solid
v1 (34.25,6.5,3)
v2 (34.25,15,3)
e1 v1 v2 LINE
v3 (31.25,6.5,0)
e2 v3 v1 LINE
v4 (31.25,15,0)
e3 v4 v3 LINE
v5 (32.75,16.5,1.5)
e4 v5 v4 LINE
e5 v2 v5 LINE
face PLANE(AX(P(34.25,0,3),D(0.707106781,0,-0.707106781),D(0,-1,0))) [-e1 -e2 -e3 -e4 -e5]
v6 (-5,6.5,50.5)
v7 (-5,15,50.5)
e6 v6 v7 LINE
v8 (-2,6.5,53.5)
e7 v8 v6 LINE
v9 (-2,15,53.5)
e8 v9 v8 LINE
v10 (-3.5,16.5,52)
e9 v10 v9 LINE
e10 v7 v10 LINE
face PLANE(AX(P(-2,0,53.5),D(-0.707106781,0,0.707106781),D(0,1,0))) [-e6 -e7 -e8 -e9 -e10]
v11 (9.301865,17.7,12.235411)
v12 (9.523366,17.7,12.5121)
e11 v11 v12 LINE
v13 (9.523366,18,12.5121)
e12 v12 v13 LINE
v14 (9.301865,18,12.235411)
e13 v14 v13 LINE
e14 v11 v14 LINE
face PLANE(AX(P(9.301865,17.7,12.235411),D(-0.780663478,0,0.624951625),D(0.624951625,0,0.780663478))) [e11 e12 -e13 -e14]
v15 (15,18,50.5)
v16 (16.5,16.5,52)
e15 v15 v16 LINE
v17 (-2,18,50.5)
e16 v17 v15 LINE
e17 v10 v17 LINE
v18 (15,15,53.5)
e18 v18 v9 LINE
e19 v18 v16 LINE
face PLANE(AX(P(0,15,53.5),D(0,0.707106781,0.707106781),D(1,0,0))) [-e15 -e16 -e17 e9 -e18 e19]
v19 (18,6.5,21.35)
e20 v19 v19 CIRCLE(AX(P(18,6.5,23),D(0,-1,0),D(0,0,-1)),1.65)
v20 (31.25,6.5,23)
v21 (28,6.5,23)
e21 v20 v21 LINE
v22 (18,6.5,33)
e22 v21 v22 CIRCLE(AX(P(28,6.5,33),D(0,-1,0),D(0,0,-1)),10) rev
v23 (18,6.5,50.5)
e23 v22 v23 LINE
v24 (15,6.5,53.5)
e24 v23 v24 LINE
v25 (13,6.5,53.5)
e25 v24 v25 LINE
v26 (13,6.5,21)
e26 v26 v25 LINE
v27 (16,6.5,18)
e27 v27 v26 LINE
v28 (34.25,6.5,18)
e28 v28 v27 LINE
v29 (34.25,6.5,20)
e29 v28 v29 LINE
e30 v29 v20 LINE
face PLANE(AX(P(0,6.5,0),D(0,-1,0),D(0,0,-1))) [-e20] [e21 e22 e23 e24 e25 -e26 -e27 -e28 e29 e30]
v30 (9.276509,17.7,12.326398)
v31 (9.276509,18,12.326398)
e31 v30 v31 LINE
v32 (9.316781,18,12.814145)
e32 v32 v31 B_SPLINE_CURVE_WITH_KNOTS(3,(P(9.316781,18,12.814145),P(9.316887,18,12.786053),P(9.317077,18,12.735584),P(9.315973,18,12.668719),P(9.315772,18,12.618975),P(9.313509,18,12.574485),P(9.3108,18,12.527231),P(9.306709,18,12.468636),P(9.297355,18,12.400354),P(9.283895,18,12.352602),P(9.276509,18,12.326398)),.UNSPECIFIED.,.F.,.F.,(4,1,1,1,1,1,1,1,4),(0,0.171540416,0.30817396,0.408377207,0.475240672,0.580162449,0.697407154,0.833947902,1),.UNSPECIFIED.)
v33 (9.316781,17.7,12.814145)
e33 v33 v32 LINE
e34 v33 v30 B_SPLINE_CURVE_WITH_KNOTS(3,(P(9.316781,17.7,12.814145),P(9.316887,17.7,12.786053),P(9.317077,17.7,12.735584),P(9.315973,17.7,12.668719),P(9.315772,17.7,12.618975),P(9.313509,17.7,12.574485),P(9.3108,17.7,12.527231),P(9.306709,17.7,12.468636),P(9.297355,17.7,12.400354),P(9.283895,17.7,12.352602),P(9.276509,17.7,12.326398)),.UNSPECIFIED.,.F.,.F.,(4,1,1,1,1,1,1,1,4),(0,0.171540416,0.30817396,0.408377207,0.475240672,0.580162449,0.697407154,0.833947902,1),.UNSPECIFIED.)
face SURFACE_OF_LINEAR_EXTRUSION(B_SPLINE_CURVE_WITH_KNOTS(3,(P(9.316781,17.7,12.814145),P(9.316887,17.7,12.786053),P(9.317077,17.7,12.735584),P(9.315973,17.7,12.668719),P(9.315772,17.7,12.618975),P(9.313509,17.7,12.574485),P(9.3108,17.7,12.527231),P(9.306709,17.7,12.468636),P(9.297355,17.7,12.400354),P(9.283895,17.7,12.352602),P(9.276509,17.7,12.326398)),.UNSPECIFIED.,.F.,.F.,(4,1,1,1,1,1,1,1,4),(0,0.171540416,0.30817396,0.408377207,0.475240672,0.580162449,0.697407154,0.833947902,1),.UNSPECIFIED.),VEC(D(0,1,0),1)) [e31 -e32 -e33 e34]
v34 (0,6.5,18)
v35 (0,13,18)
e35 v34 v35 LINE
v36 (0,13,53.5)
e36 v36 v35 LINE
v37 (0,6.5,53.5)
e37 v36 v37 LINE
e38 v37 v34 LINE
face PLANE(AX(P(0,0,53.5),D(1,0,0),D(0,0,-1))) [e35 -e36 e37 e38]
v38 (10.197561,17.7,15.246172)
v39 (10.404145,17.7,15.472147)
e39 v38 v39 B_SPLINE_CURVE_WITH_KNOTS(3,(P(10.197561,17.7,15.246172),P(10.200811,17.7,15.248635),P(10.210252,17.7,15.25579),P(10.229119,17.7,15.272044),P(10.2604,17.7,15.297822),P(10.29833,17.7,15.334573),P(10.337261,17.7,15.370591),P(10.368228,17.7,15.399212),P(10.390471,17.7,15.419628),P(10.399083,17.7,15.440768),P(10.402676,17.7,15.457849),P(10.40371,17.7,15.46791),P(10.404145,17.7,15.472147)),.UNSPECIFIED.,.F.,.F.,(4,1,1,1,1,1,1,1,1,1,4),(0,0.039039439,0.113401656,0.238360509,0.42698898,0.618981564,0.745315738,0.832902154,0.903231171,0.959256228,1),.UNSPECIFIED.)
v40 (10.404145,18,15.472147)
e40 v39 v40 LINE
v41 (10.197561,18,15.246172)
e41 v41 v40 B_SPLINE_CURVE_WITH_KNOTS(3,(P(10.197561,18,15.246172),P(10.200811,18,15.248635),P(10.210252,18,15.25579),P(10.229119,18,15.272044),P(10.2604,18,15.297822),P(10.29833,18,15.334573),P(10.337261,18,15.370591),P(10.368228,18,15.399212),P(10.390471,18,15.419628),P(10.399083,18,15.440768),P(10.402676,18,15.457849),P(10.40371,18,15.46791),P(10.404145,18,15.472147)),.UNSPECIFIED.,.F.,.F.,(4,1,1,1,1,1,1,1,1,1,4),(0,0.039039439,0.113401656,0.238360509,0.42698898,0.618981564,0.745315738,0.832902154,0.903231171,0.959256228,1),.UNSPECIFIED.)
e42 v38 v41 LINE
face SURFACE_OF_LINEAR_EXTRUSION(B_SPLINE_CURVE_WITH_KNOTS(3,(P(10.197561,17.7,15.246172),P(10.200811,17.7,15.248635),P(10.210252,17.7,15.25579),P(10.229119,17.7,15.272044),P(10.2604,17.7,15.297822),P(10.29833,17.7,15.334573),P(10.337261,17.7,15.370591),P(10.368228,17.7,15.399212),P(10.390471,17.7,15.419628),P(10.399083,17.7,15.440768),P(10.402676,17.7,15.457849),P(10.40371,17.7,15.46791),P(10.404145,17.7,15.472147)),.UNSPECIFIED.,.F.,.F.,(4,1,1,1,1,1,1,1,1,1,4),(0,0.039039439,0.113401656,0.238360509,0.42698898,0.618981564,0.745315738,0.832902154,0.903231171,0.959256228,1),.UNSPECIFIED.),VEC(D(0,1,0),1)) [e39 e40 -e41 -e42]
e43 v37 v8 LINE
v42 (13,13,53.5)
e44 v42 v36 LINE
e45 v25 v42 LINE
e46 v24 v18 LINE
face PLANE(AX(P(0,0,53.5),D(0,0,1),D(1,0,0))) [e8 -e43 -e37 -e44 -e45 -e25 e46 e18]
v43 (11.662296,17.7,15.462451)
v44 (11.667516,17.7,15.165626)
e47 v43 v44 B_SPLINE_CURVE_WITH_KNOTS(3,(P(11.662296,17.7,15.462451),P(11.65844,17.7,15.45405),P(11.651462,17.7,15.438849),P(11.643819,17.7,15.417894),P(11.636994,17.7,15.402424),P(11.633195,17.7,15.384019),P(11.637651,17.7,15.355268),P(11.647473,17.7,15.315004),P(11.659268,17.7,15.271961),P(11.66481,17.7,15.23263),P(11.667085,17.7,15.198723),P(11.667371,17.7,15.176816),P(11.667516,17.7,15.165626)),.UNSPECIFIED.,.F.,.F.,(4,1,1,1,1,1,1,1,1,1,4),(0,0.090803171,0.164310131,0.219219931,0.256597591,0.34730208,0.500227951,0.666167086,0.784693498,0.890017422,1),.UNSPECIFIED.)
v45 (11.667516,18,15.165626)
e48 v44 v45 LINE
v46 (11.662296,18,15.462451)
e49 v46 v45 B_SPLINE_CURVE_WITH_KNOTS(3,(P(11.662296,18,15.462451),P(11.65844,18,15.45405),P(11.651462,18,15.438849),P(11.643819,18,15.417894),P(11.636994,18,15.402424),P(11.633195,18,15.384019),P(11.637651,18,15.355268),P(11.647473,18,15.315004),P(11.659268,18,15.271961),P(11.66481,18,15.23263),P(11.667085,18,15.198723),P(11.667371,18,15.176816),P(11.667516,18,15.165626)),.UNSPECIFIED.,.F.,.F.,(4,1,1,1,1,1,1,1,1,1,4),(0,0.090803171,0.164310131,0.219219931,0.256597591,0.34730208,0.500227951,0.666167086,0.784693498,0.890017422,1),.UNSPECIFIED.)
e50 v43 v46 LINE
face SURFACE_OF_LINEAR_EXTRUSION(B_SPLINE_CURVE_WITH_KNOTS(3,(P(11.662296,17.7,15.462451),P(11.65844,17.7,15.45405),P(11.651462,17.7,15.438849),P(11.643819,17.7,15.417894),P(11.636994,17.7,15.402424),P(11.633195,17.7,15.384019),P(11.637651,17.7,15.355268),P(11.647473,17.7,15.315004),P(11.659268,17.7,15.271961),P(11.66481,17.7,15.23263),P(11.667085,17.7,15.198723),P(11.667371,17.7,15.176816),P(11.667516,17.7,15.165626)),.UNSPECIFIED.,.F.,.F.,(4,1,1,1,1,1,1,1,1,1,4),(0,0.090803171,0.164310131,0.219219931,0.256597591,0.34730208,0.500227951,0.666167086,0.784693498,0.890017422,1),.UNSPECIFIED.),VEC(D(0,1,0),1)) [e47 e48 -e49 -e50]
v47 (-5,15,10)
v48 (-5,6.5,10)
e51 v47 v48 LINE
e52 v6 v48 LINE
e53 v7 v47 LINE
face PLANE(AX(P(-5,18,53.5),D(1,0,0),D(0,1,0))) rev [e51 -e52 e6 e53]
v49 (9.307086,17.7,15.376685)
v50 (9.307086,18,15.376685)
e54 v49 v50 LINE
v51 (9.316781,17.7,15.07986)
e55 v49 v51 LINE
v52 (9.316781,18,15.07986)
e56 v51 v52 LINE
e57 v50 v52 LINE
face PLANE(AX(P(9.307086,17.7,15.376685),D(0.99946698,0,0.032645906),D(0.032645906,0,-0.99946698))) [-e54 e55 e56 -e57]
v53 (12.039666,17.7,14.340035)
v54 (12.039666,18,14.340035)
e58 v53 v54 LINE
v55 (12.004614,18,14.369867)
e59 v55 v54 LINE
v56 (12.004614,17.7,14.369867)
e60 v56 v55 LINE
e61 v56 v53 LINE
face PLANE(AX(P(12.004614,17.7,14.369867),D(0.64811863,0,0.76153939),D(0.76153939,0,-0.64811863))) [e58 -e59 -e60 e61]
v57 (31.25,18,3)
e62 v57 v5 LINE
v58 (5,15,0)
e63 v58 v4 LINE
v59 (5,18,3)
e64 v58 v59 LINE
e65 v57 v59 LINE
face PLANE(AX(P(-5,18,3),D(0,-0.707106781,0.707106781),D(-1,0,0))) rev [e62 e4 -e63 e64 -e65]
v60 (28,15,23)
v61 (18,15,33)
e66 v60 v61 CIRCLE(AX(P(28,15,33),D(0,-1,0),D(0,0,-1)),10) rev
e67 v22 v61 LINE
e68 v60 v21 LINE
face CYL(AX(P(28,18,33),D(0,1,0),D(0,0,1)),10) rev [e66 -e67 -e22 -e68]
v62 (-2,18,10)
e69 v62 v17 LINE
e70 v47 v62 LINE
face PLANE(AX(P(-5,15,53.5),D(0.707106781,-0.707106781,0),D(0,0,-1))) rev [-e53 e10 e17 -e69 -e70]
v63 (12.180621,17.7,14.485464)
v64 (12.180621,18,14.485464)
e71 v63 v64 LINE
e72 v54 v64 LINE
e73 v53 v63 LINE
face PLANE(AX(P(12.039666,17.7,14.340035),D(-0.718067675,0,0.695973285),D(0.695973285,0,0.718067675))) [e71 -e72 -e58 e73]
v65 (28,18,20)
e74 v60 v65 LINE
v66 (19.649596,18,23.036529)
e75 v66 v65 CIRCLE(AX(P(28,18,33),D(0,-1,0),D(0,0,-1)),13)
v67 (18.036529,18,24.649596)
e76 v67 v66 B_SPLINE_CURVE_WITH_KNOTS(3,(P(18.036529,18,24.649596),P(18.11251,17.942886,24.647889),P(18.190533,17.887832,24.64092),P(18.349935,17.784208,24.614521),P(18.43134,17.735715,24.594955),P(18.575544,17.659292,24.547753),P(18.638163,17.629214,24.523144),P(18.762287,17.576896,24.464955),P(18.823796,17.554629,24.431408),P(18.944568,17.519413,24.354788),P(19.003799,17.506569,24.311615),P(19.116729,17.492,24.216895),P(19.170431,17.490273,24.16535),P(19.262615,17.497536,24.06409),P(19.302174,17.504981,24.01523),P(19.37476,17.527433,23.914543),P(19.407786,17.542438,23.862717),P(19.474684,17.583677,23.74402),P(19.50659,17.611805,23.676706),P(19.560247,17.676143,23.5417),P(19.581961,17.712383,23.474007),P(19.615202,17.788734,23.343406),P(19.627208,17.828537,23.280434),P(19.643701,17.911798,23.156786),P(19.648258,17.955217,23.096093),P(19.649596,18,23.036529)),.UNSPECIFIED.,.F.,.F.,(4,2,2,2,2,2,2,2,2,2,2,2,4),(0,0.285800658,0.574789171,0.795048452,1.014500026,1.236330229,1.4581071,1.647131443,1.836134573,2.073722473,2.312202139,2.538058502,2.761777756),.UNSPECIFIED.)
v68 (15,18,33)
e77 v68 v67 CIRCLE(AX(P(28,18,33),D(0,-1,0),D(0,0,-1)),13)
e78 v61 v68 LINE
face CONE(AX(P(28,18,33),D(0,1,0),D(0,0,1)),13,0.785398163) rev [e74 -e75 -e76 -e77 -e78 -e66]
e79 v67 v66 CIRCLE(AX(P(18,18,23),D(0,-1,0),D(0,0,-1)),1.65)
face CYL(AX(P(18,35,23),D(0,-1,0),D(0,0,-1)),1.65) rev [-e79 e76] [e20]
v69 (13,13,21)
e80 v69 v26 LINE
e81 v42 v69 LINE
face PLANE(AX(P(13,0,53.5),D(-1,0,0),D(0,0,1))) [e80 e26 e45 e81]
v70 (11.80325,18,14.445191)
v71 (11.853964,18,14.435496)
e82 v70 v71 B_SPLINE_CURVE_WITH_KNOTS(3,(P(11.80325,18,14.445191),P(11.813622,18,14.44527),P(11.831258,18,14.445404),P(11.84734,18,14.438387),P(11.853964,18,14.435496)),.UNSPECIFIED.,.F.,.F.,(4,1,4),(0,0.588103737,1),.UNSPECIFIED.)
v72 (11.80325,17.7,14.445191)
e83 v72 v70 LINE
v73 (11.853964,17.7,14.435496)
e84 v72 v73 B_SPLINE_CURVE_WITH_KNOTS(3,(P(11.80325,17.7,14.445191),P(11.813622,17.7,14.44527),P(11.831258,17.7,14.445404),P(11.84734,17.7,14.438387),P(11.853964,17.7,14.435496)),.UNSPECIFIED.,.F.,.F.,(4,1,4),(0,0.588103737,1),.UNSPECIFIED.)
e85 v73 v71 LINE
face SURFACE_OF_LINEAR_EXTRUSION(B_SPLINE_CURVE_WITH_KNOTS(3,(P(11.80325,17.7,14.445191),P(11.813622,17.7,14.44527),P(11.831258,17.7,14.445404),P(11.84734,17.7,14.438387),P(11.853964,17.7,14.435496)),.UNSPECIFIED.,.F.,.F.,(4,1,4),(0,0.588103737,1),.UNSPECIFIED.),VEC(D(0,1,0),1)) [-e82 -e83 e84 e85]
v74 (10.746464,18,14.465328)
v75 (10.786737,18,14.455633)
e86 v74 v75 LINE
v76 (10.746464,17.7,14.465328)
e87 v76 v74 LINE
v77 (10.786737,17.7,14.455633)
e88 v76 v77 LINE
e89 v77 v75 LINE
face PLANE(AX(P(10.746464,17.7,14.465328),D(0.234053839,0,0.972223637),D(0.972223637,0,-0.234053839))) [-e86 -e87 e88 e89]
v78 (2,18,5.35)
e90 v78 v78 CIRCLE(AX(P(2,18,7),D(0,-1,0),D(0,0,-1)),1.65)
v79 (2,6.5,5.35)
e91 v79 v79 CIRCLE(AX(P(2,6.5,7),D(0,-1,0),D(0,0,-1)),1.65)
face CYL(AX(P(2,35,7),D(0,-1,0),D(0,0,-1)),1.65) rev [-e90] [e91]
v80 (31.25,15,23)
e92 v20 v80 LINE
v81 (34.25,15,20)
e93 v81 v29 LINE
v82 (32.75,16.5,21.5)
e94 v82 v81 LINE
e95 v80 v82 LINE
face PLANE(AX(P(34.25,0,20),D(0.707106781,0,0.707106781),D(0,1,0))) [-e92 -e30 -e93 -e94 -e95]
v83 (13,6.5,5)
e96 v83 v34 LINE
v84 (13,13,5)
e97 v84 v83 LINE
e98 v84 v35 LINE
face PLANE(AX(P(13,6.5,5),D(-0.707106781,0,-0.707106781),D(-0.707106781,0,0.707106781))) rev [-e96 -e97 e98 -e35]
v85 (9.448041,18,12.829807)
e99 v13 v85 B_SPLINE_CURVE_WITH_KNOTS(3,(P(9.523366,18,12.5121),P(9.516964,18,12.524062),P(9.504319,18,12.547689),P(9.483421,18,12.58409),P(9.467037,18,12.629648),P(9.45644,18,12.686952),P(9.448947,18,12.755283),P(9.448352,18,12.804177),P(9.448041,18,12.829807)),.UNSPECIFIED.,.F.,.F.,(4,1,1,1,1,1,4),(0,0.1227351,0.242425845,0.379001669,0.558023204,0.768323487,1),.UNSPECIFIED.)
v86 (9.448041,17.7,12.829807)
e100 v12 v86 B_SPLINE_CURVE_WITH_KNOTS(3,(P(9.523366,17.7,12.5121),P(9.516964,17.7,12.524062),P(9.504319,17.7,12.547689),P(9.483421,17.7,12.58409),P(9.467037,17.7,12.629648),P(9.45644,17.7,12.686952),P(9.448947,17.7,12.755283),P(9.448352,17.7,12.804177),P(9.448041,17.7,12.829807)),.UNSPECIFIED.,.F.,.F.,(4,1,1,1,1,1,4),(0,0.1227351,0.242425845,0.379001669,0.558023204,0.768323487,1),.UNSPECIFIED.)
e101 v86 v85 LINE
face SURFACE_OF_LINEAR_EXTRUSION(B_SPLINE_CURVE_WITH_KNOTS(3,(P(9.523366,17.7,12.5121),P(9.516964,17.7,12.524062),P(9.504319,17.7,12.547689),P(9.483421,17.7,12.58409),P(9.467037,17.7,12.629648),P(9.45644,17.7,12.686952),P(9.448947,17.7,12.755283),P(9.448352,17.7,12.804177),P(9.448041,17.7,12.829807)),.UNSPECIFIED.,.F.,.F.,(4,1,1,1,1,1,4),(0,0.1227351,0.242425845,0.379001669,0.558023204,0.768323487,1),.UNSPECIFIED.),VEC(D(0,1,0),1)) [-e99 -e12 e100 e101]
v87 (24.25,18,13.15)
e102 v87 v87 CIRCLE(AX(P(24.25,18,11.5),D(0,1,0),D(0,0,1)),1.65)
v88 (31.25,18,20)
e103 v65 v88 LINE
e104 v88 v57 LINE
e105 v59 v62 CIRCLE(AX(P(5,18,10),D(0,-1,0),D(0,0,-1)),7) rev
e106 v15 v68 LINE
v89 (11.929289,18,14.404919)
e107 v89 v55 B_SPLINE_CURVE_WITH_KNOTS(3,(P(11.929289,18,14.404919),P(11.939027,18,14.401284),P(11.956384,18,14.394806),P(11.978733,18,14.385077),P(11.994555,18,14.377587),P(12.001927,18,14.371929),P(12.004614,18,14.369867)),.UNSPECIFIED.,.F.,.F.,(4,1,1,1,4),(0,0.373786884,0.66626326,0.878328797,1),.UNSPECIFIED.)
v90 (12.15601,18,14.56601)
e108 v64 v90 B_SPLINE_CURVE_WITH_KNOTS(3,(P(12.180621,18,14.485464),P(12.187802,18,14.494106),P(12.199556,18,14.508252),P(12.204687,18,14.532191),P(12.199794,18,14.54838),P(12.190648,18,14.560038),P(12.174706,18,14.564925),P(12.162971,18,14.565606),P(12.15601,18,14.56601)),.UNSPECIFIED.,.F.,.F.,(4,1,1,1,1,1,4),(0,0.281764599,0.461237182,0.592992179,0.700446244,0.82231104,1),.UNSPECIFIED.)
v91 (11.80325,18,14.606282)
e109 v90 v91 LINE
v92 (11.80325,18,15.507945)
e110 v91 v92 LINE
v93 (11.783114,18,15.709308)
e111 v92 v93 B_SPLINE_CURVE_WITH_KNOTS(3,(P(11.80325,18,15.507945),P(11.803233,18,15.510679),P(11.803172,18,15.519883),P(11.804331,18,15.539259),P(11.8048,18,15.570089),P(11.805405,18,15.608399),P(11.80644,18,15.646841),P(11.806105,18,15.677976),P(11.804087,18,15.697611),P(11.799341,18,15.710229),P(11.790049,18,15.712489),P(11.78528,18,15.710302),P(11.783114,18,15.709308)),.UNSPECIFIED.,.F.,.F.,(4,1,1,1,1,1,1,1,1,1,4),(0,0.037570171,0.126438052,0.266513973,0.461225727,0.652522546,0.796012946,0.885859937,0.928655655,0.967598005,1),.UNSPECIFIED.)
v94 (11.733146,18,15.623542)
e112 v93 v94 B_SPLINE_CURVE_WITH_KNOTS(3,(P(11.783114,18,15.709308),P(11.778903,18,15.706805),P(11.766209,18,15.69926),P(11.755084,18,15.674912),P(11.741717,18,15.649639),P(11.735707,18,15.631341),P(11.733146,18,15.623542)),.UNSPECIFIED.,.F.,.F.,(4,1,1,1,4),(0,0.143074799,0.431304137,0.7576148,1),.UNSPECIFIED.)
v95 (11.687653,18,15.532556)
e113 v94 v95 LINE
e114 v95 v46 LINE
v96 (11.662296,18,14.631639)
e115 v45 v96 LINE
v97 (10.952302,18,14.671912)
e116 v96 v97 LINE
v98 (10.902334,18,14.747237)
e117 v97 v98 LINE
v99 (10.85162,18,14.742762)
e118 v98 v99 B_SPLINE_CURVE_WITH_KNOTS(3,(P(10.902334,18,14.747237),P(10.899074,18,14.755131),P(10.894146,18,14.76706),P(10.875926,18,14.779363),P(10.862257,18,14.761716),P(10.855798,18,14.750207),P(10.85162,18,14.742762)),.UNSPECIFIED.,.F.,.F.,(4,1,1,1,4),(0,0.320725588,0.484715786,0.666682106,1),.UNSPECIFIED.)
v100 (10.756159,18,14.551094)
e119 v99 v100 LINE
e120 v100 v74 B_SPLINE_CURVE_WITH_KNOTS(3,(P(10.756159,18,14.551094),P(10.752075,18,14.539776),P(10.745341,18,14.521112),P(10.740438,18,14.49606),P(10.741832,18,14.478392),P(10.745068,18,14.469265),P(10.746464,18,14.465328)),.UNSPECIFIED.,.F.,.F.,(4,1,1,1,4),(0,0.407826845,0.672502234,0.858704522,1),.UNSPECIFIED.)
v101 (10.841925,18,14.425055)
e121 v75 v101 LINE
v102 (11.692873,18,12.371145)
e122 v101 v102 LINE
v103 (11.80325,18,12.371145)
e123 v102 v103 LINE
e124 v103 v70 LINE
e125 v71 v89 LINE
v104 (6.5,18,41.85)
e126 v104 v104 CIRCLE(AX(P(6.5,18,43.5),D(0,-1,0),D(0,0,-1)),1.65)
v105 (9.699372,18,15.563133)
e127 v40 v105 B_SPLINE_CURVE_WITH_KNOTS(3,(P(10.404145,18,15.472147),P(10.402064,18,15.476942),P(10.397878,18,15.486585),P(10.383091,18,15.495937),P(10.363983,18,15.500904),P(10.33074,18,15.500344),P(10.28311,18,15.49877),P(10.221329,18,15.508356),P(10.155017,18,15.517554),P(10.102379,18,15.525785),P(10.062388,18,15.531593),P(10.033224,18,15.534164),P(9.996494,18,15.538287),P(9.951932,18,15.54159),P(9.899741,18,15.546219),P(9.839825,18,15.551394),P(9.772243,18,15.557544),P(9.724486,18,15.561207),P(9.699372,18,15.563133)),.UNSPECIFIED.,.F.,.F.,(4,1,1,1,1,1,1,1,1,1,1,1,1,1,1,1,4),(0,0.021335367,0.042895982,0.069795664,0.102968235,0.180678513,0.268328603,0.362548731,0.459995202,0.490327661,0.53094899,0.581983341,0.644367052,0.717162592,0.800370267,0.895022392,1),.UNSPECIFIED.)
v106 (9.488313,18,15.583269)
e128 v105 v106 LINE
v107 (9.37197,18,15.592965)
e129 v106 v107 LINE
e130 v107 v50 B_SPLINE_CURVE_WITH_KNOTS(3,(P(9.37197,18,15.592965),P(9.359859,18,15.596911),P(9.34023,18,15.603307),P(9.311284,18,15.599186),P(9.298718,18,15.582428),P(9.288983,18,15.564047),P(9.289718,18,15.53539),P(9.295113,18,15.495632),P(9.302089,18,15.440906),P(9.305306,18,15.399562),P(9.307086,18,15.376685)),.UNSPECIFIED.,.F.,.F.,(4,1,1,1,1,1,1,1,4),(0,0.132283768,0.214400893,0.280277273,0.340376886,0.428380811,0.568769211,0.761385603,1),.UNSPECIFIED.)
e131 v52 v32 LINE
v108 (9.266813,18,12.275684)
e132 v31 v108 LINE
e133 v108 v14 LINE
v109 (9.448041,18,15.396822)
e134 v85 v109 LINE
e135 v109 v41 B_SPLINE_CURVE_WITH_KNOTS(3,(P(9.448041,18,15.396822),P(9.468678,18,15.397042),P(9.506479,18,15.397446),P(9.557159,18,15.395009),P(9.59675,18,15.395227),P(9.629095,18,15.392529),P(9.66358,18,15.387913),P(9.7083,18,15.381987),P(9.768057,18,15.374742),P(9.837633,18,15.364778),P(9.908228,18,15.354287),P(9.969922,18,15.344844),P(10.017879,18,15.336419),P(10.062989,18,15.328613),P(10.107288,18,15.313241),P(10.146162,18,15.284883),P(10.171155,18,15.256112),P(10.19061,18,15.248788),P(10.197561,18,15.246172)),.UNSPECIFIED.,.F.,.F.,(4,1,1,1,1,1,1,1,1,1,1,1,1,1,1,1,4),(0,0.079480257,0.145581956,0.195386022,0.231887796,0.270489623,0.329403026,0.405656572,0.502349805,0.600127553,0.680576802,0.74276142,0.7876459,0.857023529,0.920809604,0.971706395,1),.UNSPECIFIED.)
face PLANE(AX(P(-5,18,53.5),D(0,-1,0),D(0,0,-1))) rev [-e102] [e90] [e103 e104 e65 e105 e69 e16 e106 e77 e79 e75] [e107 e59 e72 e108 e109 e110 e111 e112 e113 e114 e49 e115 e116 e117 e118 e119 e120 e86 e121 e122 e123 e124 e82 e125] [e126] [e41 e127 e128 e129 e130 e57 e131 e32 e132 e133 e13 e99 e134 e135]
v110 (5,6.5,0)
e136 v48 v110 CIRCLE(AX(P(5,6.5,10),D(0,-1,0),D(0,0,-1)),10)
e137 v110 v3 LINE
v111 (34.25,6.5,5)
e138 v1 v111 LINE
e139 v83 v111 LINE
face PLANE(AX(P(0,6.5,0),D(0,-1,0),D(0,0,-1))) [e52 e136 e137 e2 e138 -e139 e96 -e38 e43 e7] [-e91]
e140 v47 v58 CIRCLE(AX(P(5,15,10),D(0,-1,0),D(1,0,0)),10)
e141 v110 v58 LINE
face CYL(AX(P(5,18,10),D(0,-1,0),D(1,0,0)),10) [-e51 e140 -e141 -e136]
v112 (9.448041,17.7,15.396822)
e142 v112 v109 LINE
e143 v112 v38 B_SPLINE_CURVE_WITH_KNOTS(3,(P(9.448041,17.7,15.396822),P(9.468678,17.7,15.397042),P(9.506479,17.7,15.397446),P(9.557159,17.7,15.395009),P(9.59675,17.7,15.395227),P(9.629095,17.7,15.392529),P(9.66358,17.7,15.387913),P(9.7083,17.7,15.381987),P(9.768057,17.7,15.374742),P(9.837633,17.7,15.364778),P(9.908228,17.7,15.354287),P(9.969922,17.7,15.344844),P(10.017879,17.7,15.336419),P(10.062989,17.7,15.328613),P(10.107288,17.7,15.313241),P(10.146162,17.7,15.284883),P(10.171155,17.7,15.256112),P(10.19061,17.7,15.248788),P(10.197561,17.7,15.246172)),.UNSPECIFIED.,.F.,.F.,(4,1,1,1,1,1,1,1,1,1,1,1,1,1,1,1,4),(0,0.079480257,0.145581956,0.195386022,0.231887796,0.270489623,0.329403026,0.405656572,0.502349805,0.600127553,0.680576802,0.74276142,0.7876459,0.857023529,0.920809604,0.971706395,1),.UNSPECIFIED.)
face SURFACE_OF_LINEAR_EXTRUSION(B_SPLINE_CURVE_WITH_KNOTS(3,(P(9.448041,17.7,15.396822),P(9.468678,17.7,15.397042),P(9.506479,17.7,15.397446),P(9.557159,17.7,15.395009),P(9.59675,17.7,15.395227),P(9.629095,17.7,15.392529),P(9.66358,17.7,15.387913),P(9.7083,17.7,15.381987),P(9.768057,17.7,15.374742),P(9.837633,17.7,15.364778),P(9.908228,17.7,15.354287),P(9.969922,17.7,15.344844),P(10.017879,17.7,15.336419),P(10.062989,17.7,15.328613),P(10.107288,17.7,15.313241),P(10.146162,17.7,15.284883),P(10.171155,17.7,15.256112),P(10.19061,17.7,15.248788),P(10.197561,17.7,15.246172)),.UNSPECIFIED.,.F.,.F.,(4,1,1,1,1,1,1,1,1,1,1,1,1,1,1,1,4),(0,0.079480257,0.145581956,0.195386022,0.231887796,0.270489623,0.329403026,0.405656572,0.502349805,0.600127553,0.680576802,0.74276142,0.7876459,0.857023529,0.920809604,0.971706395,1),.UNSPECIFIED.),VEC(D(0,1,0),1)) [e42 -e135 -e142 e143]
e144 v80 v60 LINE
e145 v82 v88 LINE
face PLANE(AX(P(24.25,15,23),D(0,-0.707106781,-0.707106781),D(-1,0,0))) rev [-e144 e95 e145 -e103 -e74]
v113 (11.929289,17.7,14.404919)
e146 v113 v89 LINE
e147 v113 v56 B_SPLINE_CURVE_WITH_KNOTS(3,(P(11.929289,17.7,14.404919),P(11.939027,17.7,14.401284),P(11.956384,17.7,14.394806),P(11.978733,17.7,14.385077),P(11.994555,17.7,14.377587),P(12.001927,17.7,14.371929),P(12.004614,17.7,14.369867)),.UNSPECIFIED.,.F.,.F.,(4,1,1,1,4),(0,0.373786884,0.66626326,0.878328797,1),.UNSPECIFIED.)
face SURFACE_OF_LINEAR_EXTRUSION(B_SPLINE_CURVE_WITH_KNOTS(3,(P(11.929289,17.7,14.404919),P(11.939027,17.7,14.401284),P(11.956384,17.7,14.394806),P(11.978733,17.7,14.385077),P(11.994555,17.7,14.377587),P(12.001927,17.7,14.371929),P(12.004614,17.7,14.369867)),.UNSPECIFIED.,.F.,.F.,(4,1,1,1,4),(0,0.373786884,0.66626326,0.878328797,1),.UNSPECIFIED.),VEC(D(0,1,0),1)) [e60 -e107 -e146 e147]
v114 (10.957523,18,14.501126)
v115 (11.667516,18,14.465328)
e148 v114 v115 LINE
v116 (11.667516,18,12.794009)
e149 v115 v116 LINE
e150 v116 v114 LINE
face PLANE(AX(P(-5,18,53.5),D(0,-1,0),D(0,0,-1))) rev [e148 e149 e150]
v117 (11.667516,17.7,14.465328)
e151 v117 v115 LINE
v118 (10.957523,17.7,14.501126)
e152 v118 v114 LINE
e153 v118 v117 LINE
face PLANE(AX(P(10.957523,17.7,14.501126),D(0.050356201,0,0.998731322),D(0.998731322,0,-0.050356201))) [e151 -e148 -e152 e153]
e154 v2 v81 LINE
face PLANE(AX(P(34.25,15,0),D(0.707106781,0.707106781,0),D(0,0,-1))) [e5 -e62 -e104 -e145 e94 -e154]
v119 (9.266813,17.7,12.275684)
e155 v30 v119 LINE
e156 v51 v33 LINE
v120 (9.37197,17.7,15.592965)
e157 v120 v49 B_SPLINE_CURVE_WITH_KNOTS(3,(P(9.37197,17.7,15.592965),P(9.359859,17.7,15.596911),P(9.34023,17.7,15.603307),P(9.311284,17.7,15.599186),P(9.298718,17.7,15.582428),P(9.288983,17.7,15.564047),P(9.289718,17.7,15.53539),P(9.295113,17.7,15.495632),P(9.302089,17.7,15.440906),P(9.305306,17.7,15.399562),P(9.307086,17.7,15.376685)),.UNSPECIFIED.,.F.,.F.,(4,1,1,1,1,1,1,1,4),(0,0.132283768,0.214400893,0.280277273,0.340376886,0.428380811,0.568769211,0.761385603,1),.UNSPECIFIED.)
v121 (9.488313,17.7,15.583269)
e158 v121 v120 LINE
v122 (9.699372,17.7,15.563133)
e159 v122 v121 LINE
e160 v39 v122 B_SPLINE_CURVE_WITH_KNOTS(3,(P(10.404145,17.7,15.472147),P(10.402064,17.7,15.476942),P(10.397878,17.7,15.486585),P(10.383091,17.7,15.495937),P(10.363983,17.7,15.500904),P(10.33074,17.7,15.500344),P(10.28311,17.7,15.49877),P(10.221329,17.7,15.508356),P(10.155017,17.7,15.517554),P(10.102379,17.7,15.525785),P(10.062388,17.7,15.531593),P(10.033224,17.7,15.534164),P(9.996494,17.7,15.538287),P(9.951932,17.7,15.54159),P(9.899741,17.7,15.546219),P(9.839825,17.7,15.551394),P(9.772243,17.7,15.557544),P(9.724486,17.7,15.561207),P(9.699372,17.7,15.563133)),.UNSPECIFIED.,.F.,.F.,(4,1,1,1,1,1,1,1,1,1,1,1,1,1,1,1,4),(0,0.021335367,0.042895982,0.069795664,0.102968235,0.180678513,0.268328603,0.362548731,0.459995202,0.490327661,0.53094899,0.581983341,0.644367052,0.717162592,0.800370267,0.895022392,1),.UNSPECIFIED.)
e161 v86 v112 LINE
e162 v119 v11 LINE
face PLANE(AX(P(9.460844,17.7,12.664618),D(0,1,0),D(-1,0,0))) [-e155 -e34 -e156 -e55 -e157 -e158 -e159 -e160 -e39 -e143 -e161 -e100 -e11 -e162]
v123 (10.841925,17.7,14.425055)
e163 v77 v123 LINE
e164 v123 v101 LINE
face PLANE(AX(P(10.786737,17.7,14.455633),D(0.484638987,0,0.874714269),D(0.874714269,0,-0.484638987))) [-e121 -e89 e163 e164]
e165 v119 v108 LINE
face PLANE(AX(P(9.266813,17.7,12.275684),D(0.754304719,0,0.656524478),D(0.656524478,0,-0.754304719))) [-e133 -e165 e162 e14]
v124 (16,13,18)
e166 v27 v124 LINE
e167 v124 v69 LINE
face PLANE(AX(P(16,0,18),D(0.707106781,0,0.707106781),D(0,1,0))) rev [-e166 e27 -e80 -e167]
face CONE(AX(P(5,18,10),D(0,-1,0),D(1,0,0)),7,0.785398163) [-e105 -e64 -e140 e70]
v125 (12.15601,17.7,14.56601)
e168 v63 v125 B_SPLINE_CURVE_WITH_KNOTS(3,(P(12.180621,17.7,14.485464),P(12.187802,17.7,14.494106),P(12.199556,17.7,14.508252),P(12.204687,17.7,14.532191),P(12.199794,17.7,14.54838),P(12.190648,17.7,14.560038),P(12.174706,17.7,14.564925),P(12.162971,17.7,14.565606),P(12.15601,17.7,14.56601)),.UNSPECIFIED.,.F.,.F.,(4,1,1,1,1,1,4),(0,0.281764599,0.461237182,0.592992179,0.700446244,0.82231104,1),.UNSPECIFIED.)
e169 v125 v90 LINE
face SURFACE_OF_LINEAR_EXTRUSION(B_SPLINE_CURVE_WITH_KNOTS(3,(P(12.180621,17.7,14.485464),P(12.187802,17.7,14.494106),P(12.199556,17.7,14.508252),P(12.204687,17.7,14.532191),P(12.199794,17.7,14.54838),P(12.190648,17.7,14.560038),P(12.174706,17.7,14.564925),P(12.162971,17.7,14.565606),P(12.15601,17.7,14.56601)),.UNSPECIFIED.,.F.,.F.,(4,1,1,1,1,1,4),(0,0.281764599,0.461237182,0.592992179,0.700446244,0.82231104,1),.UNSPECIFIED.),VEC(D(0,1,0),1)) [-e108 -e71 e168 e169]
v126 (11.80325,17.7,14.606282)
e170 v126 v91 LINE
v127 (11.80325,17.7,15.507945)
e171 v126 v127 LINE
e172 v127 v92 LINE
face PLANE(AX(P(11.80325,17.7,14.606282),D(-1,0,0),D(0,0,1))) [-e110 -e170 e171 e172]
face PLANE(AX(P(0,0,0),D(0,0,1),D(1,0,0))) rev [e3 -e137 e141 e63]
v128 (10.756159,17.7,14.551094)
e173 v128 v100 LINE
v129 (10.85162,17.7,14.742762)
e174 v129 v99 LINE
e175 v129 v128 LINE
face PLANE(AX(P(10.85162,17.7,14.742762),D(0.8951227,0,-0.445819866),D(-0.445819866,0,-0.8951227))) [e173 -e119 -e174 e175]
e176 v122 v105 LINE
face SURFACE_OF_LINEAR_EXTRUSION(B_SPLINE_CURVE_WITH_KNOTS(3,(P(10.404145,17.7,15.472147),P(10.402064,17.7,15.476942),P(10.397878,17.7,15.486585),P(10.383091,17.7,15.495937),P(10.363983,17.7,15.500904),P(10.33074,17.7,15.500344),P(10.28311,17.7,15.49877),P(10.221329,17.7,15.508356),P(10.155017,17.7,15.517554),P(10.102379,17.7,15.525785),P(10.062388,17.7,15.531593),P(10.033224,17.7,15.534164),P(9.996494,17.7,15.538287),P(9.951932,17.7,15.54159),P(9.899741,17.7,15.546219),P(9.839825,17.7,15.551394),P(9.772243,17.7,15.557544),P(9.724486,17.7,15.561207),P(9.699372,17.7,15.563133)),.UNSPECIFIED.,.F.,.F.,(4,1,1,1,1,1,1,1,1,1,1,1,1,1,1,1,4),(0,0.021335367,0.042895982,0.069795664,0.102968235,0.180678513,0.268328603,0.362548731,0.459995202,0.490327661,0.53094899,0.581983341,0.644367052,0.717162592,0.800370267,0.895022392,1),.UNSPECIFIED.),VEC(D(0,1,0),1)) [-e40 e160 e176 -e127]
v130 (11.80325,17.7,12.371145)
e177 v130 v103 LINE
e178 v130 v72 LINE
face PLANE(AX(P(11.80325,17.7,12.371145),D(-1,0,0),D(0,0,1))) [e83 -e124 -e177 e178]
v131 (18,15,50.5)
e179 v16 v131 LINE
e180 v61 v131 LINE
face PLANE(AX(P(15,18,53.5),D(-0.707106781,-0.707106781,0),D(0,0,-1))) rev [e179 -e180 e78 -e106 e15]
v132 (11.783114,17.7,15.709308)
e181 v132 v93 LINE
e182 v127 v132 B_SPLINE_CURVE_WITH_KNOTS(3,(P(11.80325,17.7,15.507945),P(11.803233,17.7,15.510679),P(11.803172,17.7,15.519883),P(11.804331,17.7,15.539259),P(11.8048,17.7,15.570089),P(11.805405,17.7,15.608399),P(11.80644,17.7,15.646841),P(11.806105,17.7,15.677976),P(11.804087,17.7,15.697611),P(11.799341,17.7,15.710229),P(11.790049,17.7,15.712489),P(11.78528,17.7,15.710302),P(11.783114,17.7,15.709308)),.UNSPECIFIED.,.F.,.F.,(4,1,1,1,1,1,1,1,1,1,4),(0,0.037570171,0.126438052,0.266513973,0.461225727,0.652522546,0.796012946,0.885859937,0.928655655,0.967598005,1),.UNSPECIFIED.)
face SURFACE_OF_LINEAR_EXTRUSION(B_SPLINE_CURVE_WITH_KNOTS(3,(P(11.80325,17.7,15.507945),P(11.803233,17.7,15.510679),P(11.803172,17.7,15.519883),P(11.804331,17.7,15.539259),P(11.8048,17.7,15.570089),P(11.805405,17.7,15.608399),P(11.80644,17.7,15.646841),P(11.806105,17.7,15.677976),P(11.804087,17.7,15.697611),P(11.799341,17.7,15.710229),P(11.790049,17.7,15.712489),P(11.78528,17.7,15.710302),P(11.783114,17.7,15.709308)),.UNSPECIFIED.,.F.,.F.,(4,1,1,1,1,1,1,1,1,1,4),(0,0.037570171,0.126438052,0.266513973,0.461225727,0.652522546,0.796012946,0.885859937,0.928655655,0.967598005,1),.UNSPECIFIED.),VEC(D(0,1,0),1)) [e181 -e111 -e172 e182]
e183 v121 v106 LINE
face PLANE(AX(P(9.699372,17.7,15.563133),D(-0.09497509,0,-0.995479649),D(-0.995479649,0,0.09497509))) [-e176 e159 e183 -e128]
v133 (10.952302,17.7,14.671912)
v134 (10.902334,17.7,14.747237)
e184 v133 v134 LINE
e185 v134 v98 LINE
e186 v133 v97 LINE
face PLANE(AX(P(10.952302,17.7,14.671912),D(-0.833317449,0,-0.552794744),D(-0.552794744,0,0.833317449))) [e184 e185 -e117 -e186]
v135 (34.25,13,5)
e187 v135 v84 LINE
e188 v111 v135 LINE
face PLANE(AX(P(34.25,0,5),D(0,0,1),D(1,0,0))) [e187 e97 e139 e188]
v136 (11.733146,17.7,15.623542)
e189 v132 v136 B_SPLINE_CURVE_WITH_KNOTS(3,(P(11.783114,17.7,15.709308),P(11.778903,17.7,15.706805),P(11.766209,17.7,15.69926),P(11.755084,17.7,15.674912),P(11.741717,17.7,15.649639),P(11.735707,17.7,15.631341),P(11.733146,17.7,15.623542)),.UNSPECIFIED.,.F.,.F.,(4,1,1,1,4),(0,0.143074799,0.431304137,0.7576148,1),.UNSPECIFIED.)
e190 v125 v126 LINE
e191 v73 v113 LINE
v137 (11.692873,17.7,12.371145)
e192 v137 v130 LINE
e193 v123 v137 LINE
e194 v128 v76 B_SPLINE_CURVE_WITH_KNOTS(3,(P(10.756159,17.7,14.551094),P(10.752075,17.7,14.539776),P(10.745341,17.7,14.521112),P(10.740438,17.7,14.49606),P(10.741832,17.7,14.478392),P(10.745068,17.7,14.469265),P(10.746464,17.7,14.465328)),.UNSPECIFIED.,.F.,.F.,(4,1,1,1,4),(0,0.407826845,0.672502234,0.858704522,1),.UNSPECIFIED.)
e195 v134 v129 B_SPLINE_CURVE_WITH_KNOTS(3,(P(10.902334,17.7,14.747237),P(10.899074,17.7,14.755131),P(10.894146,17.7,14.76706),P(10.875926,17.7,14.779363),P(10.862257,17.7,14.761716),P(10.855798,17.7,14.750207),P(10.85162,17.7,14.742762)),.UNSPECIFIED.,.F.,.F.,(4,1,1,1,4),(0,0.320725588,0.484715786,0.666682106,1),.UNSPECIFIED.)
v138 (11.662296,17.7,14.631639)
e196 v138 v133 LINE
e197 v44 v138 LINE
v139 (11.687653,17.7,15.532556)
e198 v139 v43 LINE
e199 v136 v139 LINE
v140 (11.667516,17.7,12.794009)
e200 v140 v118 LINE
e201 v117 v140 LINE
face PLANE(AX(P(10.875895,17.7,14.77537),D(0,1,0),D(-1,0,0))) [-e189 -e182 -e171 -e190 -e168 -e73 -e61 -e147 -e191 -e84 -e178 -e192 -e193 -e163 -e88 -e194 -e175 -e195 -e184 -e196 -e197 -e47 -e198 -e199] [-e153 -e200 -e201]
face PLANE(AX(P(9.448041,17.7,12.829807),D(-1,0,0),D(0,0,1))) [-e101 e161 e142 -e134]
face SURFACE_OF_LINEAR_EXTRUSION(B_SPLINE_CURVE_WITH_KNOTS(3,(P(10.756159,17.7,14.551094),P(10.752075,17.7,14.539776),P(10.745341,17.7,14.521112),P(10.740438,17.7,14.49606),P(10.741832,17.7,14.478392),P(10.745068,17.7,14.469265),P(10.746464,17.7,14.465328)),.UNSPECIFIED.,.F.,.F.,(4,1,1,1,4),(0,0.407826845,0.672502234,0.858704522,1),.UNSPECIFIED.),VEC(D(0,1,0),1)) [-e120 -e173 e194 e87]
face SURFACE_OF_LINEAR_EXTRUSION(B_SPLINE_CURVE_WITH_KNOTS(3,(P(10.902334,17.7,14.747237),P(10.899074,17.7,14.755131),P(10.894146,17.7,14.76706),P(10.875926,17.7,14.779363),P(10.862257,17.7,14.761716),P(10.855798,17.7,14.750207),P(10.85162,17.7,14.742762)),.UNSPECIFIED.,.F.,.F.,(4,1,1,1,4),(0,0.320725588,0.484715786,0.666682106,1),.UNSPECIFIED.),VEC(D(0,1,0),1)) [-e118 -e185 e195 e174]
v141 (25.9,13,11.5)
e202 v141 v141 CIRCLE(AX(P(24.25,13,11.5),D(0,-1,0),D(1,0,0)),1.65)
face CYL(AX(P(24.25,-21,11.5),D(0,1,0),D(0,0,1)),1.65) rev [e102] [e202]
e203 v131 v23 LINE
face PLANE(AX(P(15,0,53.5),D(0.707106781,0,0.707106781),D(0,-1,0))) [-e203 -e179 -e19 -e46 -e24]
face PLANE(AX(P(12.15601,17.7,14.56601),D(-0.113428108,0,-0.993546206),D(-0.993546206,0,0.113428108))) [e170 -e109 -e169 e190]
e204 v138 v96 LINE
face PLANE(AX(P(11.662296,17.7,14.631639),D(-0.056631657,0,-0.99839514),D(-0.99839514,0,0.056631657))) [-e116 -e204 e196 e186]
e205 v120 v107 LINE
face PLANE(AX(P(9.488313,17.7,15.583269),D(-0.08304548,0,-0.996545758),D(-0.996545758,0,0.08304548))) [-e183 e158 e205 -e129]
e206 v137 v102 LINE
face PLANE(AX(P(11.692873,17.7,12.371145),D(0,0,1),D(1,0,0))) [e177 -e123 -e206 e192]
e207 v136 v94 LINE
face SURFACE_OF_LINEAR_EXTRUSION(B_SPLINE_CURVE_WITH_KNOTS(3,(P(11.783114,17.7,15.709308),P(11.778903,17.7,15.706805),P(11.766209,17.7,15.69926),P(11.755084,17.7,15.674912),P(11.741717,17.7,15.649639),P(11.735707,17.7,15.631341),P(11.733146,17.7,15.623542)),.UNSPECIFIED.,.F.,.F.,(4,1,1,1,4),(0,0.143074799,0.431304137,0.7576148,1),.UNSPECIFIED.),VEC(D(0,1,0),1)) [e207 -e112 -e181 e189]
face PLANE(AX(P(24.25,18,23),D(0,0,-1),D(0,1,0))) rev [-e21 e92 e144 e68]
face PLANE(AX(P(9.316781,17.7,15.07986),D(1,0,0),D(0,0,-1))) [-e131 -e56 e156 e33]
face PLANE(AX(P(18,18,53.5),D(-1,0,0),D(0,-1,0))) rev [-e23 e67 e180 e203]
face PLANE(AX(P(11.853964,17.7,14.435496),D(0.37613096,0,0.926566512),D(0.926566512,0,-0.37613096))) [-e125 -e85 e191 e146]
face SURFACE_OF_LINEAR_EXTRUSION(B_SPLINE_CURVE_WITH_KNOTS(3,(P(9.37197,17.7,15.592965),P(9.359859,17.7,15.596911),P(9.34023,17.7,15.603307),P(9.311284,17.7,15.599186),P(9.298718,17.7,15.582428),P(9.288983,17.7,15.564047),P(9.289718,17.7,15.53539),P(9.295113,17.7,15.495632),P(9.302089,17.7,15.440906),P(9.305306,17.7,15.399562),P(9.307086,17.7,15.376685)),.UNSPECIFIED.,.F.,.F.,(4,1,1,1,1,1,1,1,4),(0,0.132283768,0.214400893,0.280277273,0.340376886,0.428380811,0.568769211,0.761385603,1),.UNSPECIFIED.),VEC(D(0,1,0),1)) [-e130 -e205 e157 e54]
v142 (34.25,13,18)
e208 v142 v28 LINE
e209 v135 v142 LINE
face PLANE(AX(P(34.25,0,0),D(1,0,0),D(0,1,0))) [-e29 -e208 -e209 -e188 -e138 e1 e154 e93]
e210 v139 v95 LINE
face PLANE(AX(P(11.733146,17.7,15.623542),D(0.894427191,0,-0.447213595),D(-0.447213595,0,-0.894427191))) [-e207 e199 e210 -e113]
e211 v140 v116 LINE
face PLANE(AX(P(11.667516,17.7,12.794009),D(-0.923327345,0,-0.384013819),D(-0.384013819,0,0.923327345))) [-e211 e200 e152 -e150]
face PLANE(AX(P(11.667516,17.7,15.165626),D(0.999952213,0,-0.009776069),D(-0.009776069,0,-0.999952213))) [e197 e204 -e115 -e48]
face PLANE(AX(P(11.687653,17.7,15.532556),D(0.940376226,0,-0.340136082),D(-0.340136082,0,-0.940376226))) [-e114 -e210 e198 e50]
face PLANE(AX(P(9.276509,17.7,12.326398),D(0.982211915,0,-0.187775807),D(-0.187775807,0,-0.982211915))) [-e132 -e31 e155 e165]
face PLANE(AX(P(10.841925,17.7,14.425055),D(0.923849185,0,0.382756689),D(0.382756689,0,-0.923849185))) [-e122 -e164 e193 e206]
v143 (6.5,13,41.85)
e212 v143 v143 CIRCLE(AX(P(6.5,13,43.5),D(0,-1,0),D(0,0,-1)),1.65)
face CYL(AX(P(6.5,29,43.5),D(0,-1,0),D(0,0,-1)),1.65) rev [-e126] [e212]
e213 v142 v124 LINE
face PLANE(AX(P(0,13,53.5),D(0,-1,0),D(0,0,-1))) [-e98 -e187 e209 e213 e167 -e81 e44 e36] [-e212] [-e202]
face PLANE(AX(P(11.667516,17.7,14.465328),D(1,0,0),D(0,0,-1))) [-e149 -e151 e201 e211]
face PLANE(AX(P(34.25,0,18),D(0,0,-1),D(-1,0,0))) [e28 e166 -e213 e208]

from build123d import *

# Parameters (mm, degrees)
SKETCH_1_W          = 23
SKETCH_1_H          = 23
SKETCH_1_W_2        = 13
SKETCH_1_H_2        = 13
EXTRUDE_1_DEPTH     = 53.5
SKETCH_2_R          = 1.65
CUT_EXTRUDE_1_DEPTH = 34
SKETCH_4_W          = 23
SKETCH_4_H          = 23
SKETCH_4_R          = 3
EXTRUDE_2_DEPTH     = 6.25
SKETCH_5_W          = 23
SKETCH_5_H          = 23
SKETCH_5_W_2        = 13
SKETCH_5_H_2        = 13
EXTRUDE_1_2_DEPTH   = 10
SKETCH_6_R          = 1.65
CUT_EXTRUDE_2_DEPTH = 39
SKETCH_7_W          = 13
SKETCH_7_H          = 13
CUT_EXTRUDE_3_DEPTH = 15.75
CHAMFER_1_SIZE      = 3
SKETCH_8_W          = 39.25
SKETCH_8_H          = 53.5
CUT_EXTRUDE_4_DEPTH = 11.5
EXTRUDE_3_DEPTH     = 6.5
FILLET_1_R          = 10
FILLET_2_R          = 10
SKETCH_10_R         = 1.65
CUT_EXTRUDE_5_DEPTH = 28.5
CHAMFER_3_SIZE      = 3
CHAMFER_4_SIZE      = 3
CHAMFER_5_SIZE      = 3
CUT_EXTRUDE_6_DEPTH = 0.3


with BuildPart() as part:
    # 草图1 → Extrude 1 (new body)
    with BuildSketch(Plane.XY):
        with Locations((6.5, 6.5)):
            Rectangle(SKETCH_1_W, SKETCH_1_H)
        with Locations((6.5, 6.5)):
            Rectangle(SKETCH_1_W_2, SKETCH_1_H_2, mode=Mode.SUBTRACT)
    extrude(amount=EXTRUDE_1_DEPTH)

    # 草图2 → 切除-拉伸1 (cut)
    with BuildSketch(Plane.XZ.offset(5)):
        with Locations(Location((6.5, 43.5, 0), (0, 0, 270))):
            Circle(SKETCH_2_R)
    extrude(amount=-CUT_EXTRUDE_1_DEPTH, mode=Mode.SUBTRACT)

    # 草图4 → 凸台-拉伸2 (add)
    with BuildSketch(Plane(origin=(18, 0, 0), x_dir=(0, 0, -1), z_dir=(1, 0, 0))):
        with Locations((-11.5, 6.5)):
            Rectangle(SKETCH_4_W, SKETCH_4_H)
        with Locations(Location((-11.5, 6.5, 0), (0, 0, 90))):
            Circle(SKETCH_4_R, mode=Mode.SUBTRACT)
    extrude(amount=EXTRUDE_2_DEPTH)

    # 草图5 → Extrude 1 2 (add)
    with BuildSketch(Plane(origin=(24.25, 0, 0), x_dir=(0, 0, -1), z_dir=(1, 0, 0))):
        with Locations((-11.5, 6.5)):
            Rectangle(SKETCH_5_W, SKETCH_5_H)
        with Locations((-11.5, 6.5)):
            Rectangle(SKETCH_5_W_2, SKETCH_5_H_2, mode=Mode.SUBTRACT)
    extrude(amount=EXTRUDE_1_2_DEPTH)

    # 草图6 → 切除-拉伸2 (cut)
    with BuildSketch(Plane(origin=(0, 18, 0), x_dir=(1, 0, 0), z_dir=(0, 1, 0))):
        with Locations(Location((24.25, -11.5, 0), (0, 0, 270))):
            Circle(SKETCH_6_R)
    extrude(amount=-CUT_EXTRUDE_2_DEPTH, mode=Mode.SUBTRACT)

    # 草图7 → 切除-拉伸3 (cut)
    with BuildSketch(Plane(origin=(24.25, 0, 0), x_dir=(0, 0, -1), z_dir=(1, 0, 0))):
        with Locations((-11.5, 6.5)):
            Rectangle(SKETCH_7_W, SKETCH_7_H)
    extrude(amount=-CUT_EXTRUDE_3_DEPTH, mode=Mode.SUBTRACT)

    # 倒角1
    chamfer_1_edges = [part.edges().sort_by_distance(p)[0] for p in [
        (13, 6.5, 18),
    ]]
    chamfer(chamfer_1_edges, length=CHAMFER_1_SIZE)

    # 草图8 → 切除-拉伸4 (cut)
    with BuildSketch(Plane.XZ.offset(5)):
        with Locations((14.625, 26.75)):
            Rectangle(SKETCH_8_W, SKETCH_8_H)
    extrude(amount=-CUT_EXTRUDE_4_DEPTH, mode=Mode.SUBTRACT)

    # 草图9 → 凸台-拉伸3 (add)
    with BuildSketch(Plane.XZ.offset(-13)):
        Polygon((13, 5), (0, 18), (0, 0), (13, 0), align=None)
    extrude(amount=EXTRUDE_3_DEPTH)

    # 圆角1
    fillet_1_edges = [part.edges().sort_by_distance(p)[0] for p in [
        (-5, 12.25, 0),
    ]]
    fillet(fillet_1_edges, radius=FILLET_1_R)

    # 圆角2
    fillet_2_edges = [part.edges().sort_by_distance(p)[0] for p in [
        (18, 12.25, 23),
    ]]
    fillet(fillet_2_edges, radius=FILLET_2_R)

    # 草图10 → 切除-拉伸5 (cut)
    with BuildSketch(Plane.XZ.offset(-6.5)):
        with Locations(Location((2, 7, 0), (0, 0, 270))):
            Circle(SKETCH_10_R)
        with Locations(Location((18, 23, 0), (0, 0, 270))):
            Circle(SKETCH_10_R)
    extrude(amount=-CUT_EXTRUDE_5_DEPTH, mode=Mode.SUBTRACT)

    # 倒角3
    # the kernel refuses this chamfer: 3 mm, written as the material it takes off along each edge
    with BuildSketch(Plane(origin=(5, 18, 10), x_dir=(0, 0, -1), z_dir=(1, 0, 0))) as chamfer_3_piece_1:
        Polygon((10 - CHAMFER_3_SIZE, 0), (10, -CHAMFER_3_SIZE), (10, 0), align=None)
    revolve(axis=Axis((5, 18, 10), (0, 1, 0)), revolution_arc=90, mode=Mode.SUBTRACT)
    with BuildSketch(Plane(origin=(28, 18, 33), x_dir=(-1, 0, 0), z_dir=(0, 0, 1))) as chamfer_3_piece_2:
        Polygon((10 + CHAMFER_3_SIZE, 0), (10, CHAMFER_3_SIZE), (10, 0), align=None)
    revolve(axis=Axis((28, 18, 33), (0, -1, 0)), revolution_arc=90, mode=Mode.SUBTRACT)
    with BuildSketch(Plane(origin=(28, 18, 23), x_dir=(0, 0.027495876610586768, -0.9996219169112968), z_dir=(1, 0, 0))) as chamfer_3_piece_3:
        Polygon((CHAMFER_3_SIZE * 0.999621916911, -CHAMFER_3_SIZE * 0.0274958766106), (-CHAMFER_3_SIZE * 0.0274958766106, -CHAMFER_3_SIZE * 0.999621916911), (0, 0), align=None)
    extrude(amount=13.965048964, mode=Mode.SUBTRACT)
    with BuildSketch(Plane(origin=(41.965048964, 18, 0), x_dir=(0, 0.027495876610586778, 0.9996219169112968), z_dir=(-1, 0, 0))) as chamfer_3_piece_4:
        Polygon((CHAMFER_3_SIZE * 0.999621916911, -CHAMFER_3_SIZE * 0.0274958766106), (-CHAMFER_3_SIZE * 0.0274958766106, -CHAMFER_3_SIZE * 0.999621916911), (0, 0), align=None)
    extrude(amount=36.965048964, mode=Mode.SUBTRACT)
    with BuildSketch(Plane(origin=(-5, 18, 10), x_dir=(0.9996219169112968, 0.027495876610586778, 0), z_dir=(0, 0, 1))) as chamfer_3_piece_5:
        Polygon((CHAMFER_3_SIZE * 0.999621916911, -CHAMFER_3_SIZE * 0.0274958766106), (-CHAMFER_3_SIZE * 0.0274958766106, -CHAMFER_3_SIZE * 0.999621916911), (0, 0), align=None)
    extrude(amount=51.215048964, mode=Mode.SUBTRACT)
    with BuildSketch(Plane(origin=(18, 18, 33), x_dir=(-0.9996219169112968, 0.02749587661058678, 0), z_dir=(0, 0, 1))) as chamfer_3_piece_6:
        Polygon((CHAMFER_3_SIZE * 0.999621916911, CHAMFER_3_SIZE * 0.0274958766106), (-CHAMFER_3_SIZE * 0.0274958766106, CHAMFER_3_SIZE * 0.999621916911), (0, 0), align=None)
    extrude(amount=28.215048964, mode=Mode.SUBTRACT)

    # 倒角4
    chamfer_4_edges = [part.edges().sort_by_distance(p)[0] for p in [
        (34.25, 18, 11.5),
        (6.5, 18, 53.5),
    ]]
    chamfer(chamfer_4_edges, length=CHAMFER_4_SIZE)

    # 倒角5
    chamfer_5_edges = [part.edges().sort_by_distance(p)[0] for p in [
        (34.25, 10.75, 0),
        (18, 10.75, 53.5),
        (-5, 10.75, 53.5),
        (34.25, 10.75, 23),
    ]]
    chamfer(chamfer_5_edges, length=CHAMFER_5_SIZE)

    # 草图11 → 切除-拉伸6 (cut)
    # profile 1 of 2: a face of its own
    with BuildSketch(Plane(origin=(0, 18, 0), x_dir=(1, 0, 0), z_dir=(0, 1, 0))):
        with BuildLine():
            Line((9.266813218, -12.275683704), (9.301865424, -12.235410958))
            Line((9.301865424, -12.235410958), (9.52336553, -12.512099643))
            add(Edge.make_bspline(
                [(9.52336553, -12.512099643), (9.516963751, -12.524061704), (9.504318984, -12.547689117), (9.483420652, -12.58408966), (9.467037494, -12.629648361), (9.4564399, -12.686951648), (9.44894746, -12.755283372), (9.448352464, -12.804177447), (9.448040578, -12.829806867)],
                knots=[0, 0, 0, 0, 0.736410598, 1.454555069, 2.274010016, 3.348139226, 4.609940921, 6, 6, 6, 6], degree=3))
            Line((9.448040578, -12.829806867), (9.448040578, -15.396821569))
            add(Edge.make_bspline(
                [(9.448040578, -15.396821569), (9.468678125, -15.397042087), (9.506479393, -15.397446004), (9.557158846, -15.395009259), (9.596750153, -15.395226891), (9.629094922, -15.392529476), (9.663579716, -15.387912913), (9.708300118, -15.381986855), (9.768057065, -15.374741756), (9.837632832, -15.364777769), (9.908227888, -15.354286785), (9.969922175, -15.344844322), (10.017878618, -15.336418923), (10.062989469, -15.328613359), (10.107288304, -15.313240575), (10.146161972, -15.284882643), (10.171155498, -15.256112424), (10.190610238, -15.248788426), (10.197561141, -15.246171665)],
                knots=[0, 0, 0, 0, 1.271684107, 2.329311289, 3.126176351, 3.710204741, 4.32783396, 5.270448411, 6.49050515, 8.03759688, 9.602040843, 10.889228832, 11.884182716, 12.602334394, 13.712376462, 14.732953672, 15.547302315, 16, 16, 16, 16], degree=3))
            add(Edge.make_bspline(
                [(10.197561141, -15.246171665), (10.200811265, -15.24863479), (10.210252218, -15.255789669), (10.229119367, -15.272044232), (10.26040013, -15.297821919), (10.298329787, -15.334573391), (10.337260708, -15.37059091), (10.368228435, -15.399211988), (10.390470603, -15.419627911), (10.399083222, -15.440767903), (10.402676117, -15.45784931), (10.403710075, -15.467910384), (10.404145415, -15.472146521)],
                knots=[0, 0, 0, 0, 0.390394386, 1.134016561, 2.38360509, 4.269889804, 6.18981564, 7.453157385, 8.329021544, 9.032311711, 9.592562279, 10, 10, 10, 10], degree=3))
            add(Edge.make_bspline(
                [(10.404145415, -15.472146521), (10.40206375, -15.476942394), (10.397878443, -15.486584772), (10.383090877, -15.495937469), (10.363982572, -15.500904408), (10.33073977, -15.500343625), (10.283110462, -15.498769522), (10.22132921, -15.508356201), (10.15501695, -15.517554008), (10.102379022, -15.525784834), (10.062387506, -15.531592767), (10.033223518, -15.534164422), (9.996494325, -15.53828724), (9.951932173, -15.541590229), (9.899741162, -15.546219376), (9.839824995, -15.551393941), (9.772242849, -15.557543502), (9.724485896, -15.561206741), (9.699372349, -15.563133097)],
                knots=[0, 0, 0, 0, 0.341365878, 0.68633572, 1.116730632, 1.647491765, 2.890856209, 4.29325764, 5.800779701, 7.359923239, 7.845242571, 8.495183841, 9.311733456, 10.309872826, 11.474601469, 12.805924266, 14.320358265, 16, 16, 16, 16], degree=3))
            Line((9.699372349, -15.563133097), (9.488313325, -15.58326947))
            Line((9.488313325, -15.58326947), (9.371969835, -15.592964761))
            add(Edge.make_bspline(
                [(9.371969835, -15.592964761), (9.359859022, -15.596910851), (9.340230241, -15.603306534), (9.311283529, -15.599186231), (9.298718203, -15.582428084), (9.288983167, -15.564046832), (9.289718075, -15.535389642), (9.295112786, -15.4956315), (9.302089302, -15.440906027), (9.305306038, -15.399562146), (9.307085965, -15.376685196)],
                knots=[0, 0, 0, 0, 1.058270145, 1.715207142, 2.242218181, 2.723015089, 3.427046488, 4.550153686, 6.091084828, 8, 8, 8, 8], degree=3))
            Line((9.307085965, -15.376685196), (9.316781256, -15.079860137))
            Line((9.316781256, -15.079860137), (9.316781256, -12.814145243))
            add(Edge.make_bspline(
                [(9.316781256, -12.814145243), (9.316886855, -12.786052717), (9.317076564, -12.735584232), (9.315973066, -12.66871921), (9.315772104, -12.618974802), (9.313508673, -12.574485109), (9.310800273, -12.527231104), (9.306709072, -12.46863647), (9.297355447, -12.400354092), (9.283895077, -12.352602109), (9.276508509, -12.326397533)],
                knots=[0, 0, 0, 0, 1.372323329, 2.465391677, 3.267017655, 3.801925377, 4.641299591, 5.579257235, 6.671583216, 8, 8, 8, 8], degree=3))
            Line((9.276508509, -12.326397533), (9.266813218, -12.275683704))
        make_face()
    # profile 2 of 2: a face of its own
    with BuildSketch(Plane(origin=(0, 18, 0), x_dir=(1, 0, 0), z_dir=(0, 1, 0))):
        with BuildLine():
            Line((11.662295852, -14.631639383), (10.952302245, -14.67191213))
            Line((10.952302245, -14.67191213), (10.902334207, -14.747237082))
            add(Edge.make_bspline(
                [(10.902334207, -14.747237082), (10.89907351, -14.755130581), (10.894145585, -14.767060104), (10.875925797, -14.779362904), (10.862257335, -14.761715586), (10.855798411, -14.750206879), (10.851620378, -14.742762332)],
                knots=[0, 0, 0, 0, 1.282902353, 1.938863145, 2.666728425, 4, 4, 4, 4], degree=3))
            Line((10.851620378, -14.742762332), (10.756159053, -14.55109389))
            add(Edge.make_bspline(
                [(10.756159053, -14.55109389), (10.752075263, -14.539775538), (10.745341137, -14.521111693), (10.740438443, -14.496060274), (10.741832408, -14.478391928), (10.74506786, -14.4692654), (10.746463762, -14.465327855)],
                knots=[0, 0, 0, 0, 1.63130738, 2.690008936, 3.434818089, 4, 4, 4, 4], degree=3))
            Line((10.746463762, -14.465327855), (10.786736508, -14.455632564))
            Line((10.786736508, -14.455632564), (10.841925087, -14.425055109))
            Line((10.841925087, -14.425055109), (11.692873308, -12.37114503))
            Line((11.692873308, -12.37114503), (11.803250465, -12.37114503))
            Line((11.803250465, -12.37114503), (11.803250465, -14.445191482))
            add(Edge.make_bspline(
                [(11.803250465, -14.445191482), (11.813622011, -14.445270114), (11.831257584, -14.445403819), (11.847340005, -14.43838657), (11.853964295, -14.435496191)],
                knots=[0, 0, 0, 0, 1.176207474, 2, 2, 2, 2], degree=3))
            Line((11.853964295, -14.435496191), (11.929289247, -14.404918735))
            add(Edge.make_bspline(
                [(11.929289247, -14.404918735), (11.939026891, -14.401284394), (11.956383934, -14.394806297), (11.978733372, -14.385077379), (11.994554633, -14.377586554), (12.001926587, -14.371929086), (12.004614199, -14.36986653)],
                knots=[0, 0, 0, 0, 1.495147538, 2.665053038, 3.513315187, 4, 4, 4, 4], degree=3))
            Line((12.004614199, -14.36986653), (12.039666404, -14.340034866))
            Line((12.039666404, -14.340034866), (12.180621017, -14.485464229))
            add(Edge.make_bspline(
                [(12.180621017, -14.485464229), (12.187801764, -14.494105754), (12.199556354, -14.508251578), (12.204686736, -14.532190552), (12.199794163, -14.548379765), (12.19064813, -14.560038294), (12.174705658, -14.564925245), (12.162970778, -14.565605945), (12.156009894, -14.566009722)],
                knots=[0, 0, 0, 0, 1.690587597, 2.767423091, 3.557953073, 4.202677464, 4.933866242, 6, 6, 6, 6], degree=3))
            Line((12.156009894, -14.566009722), (11.803250465, -14.606282468))
            Line((11.803250465, -14.606282468), (11.803250465, -15.507944518))
            add(Edge.make_bspline(
                [(11.803250465, -15.507944518), (11.803232512, -15.510679439), (11.803172094, -15.519883497), (11.80433053, -15.539259214), (11.80480027, -15.570089271), (11.805404744, -15.608399492), (11.806439968, -15.6468409), (11.8061055, -15.67797641), (11.804087339, -15.697610778), (11.799340663, -15.710229116), (11.790049194, -15.712488517), (11.785280059, -15.71030151), (11.783114092, -15.709308252)],
                knots=[0, 0, 0, 0, 0.375701713, 1.264380521, 2.665139726, 4.612257271, 6.525225464, 7.960129458, 8.858599367, 9.286556546, 9.675980055, 10, 10, 10, 10], degree=3))
            add(Edge.make_bspline(
                [(11.783114092, -15.709308252), (11.778903236, -15.706805374), (11.766209459, -15.699260359), (11.755084299, -15.674911777), (11.741716695, -15.649639385), (11.735707323, -15.631341151), (11.733146055, -15.623542217)],
                knots=[0, 0, 0, 0, 0.572299195, 1.725216547, 3.030459198, 4, 4, 4, 4], degree=3))
            Line((11.733146055, -15.623542217), (11.687652767, -15.532555641))
            Line((11.687652767, -15.532555641), (11.662295852, -15.46245123))
            add(Edge.make_bspline(
                [(11.662295852, -15.46245123), (11.658439784, -15.454050251), (11.651462153, -15.438848513), (11.643818588, -15.417893938), (11.636994063, -15.402423867), (11.633195029, -15.384019199), (11.63765141, -15.355267833), (11.647473016, -15.315004179), (11.659268246, -15.271961287), (11.664810088, -15.232629705), (11.66708518, -15.198722696), (11.667370597, -15.176816345), (11.667516393, -15.165626172)],
                knots=[0, 0, 0, 0, 0.908031708, 1.643101311, 2.192199313, 2.565975908, 3.473020803, 5.002279505, 6.661670863, 7.846934984, 8.900174221, 10, 10, 10, 10], degree=3))
            Line((11.667516393, -15.165626172), (11.662295852, -14.631639383))
        make_face()
        Polygon((11.667516393, -14.465327855), (11.667516393, -12.79400887), (10.957522786, -14.501125852), align=None, mode=Mode.SUBTRACT)
    extrude(amount=-CUT_EXTRUDE_6_DEPTH, mode=Mode.SUBTRACT)


solid = part.part
